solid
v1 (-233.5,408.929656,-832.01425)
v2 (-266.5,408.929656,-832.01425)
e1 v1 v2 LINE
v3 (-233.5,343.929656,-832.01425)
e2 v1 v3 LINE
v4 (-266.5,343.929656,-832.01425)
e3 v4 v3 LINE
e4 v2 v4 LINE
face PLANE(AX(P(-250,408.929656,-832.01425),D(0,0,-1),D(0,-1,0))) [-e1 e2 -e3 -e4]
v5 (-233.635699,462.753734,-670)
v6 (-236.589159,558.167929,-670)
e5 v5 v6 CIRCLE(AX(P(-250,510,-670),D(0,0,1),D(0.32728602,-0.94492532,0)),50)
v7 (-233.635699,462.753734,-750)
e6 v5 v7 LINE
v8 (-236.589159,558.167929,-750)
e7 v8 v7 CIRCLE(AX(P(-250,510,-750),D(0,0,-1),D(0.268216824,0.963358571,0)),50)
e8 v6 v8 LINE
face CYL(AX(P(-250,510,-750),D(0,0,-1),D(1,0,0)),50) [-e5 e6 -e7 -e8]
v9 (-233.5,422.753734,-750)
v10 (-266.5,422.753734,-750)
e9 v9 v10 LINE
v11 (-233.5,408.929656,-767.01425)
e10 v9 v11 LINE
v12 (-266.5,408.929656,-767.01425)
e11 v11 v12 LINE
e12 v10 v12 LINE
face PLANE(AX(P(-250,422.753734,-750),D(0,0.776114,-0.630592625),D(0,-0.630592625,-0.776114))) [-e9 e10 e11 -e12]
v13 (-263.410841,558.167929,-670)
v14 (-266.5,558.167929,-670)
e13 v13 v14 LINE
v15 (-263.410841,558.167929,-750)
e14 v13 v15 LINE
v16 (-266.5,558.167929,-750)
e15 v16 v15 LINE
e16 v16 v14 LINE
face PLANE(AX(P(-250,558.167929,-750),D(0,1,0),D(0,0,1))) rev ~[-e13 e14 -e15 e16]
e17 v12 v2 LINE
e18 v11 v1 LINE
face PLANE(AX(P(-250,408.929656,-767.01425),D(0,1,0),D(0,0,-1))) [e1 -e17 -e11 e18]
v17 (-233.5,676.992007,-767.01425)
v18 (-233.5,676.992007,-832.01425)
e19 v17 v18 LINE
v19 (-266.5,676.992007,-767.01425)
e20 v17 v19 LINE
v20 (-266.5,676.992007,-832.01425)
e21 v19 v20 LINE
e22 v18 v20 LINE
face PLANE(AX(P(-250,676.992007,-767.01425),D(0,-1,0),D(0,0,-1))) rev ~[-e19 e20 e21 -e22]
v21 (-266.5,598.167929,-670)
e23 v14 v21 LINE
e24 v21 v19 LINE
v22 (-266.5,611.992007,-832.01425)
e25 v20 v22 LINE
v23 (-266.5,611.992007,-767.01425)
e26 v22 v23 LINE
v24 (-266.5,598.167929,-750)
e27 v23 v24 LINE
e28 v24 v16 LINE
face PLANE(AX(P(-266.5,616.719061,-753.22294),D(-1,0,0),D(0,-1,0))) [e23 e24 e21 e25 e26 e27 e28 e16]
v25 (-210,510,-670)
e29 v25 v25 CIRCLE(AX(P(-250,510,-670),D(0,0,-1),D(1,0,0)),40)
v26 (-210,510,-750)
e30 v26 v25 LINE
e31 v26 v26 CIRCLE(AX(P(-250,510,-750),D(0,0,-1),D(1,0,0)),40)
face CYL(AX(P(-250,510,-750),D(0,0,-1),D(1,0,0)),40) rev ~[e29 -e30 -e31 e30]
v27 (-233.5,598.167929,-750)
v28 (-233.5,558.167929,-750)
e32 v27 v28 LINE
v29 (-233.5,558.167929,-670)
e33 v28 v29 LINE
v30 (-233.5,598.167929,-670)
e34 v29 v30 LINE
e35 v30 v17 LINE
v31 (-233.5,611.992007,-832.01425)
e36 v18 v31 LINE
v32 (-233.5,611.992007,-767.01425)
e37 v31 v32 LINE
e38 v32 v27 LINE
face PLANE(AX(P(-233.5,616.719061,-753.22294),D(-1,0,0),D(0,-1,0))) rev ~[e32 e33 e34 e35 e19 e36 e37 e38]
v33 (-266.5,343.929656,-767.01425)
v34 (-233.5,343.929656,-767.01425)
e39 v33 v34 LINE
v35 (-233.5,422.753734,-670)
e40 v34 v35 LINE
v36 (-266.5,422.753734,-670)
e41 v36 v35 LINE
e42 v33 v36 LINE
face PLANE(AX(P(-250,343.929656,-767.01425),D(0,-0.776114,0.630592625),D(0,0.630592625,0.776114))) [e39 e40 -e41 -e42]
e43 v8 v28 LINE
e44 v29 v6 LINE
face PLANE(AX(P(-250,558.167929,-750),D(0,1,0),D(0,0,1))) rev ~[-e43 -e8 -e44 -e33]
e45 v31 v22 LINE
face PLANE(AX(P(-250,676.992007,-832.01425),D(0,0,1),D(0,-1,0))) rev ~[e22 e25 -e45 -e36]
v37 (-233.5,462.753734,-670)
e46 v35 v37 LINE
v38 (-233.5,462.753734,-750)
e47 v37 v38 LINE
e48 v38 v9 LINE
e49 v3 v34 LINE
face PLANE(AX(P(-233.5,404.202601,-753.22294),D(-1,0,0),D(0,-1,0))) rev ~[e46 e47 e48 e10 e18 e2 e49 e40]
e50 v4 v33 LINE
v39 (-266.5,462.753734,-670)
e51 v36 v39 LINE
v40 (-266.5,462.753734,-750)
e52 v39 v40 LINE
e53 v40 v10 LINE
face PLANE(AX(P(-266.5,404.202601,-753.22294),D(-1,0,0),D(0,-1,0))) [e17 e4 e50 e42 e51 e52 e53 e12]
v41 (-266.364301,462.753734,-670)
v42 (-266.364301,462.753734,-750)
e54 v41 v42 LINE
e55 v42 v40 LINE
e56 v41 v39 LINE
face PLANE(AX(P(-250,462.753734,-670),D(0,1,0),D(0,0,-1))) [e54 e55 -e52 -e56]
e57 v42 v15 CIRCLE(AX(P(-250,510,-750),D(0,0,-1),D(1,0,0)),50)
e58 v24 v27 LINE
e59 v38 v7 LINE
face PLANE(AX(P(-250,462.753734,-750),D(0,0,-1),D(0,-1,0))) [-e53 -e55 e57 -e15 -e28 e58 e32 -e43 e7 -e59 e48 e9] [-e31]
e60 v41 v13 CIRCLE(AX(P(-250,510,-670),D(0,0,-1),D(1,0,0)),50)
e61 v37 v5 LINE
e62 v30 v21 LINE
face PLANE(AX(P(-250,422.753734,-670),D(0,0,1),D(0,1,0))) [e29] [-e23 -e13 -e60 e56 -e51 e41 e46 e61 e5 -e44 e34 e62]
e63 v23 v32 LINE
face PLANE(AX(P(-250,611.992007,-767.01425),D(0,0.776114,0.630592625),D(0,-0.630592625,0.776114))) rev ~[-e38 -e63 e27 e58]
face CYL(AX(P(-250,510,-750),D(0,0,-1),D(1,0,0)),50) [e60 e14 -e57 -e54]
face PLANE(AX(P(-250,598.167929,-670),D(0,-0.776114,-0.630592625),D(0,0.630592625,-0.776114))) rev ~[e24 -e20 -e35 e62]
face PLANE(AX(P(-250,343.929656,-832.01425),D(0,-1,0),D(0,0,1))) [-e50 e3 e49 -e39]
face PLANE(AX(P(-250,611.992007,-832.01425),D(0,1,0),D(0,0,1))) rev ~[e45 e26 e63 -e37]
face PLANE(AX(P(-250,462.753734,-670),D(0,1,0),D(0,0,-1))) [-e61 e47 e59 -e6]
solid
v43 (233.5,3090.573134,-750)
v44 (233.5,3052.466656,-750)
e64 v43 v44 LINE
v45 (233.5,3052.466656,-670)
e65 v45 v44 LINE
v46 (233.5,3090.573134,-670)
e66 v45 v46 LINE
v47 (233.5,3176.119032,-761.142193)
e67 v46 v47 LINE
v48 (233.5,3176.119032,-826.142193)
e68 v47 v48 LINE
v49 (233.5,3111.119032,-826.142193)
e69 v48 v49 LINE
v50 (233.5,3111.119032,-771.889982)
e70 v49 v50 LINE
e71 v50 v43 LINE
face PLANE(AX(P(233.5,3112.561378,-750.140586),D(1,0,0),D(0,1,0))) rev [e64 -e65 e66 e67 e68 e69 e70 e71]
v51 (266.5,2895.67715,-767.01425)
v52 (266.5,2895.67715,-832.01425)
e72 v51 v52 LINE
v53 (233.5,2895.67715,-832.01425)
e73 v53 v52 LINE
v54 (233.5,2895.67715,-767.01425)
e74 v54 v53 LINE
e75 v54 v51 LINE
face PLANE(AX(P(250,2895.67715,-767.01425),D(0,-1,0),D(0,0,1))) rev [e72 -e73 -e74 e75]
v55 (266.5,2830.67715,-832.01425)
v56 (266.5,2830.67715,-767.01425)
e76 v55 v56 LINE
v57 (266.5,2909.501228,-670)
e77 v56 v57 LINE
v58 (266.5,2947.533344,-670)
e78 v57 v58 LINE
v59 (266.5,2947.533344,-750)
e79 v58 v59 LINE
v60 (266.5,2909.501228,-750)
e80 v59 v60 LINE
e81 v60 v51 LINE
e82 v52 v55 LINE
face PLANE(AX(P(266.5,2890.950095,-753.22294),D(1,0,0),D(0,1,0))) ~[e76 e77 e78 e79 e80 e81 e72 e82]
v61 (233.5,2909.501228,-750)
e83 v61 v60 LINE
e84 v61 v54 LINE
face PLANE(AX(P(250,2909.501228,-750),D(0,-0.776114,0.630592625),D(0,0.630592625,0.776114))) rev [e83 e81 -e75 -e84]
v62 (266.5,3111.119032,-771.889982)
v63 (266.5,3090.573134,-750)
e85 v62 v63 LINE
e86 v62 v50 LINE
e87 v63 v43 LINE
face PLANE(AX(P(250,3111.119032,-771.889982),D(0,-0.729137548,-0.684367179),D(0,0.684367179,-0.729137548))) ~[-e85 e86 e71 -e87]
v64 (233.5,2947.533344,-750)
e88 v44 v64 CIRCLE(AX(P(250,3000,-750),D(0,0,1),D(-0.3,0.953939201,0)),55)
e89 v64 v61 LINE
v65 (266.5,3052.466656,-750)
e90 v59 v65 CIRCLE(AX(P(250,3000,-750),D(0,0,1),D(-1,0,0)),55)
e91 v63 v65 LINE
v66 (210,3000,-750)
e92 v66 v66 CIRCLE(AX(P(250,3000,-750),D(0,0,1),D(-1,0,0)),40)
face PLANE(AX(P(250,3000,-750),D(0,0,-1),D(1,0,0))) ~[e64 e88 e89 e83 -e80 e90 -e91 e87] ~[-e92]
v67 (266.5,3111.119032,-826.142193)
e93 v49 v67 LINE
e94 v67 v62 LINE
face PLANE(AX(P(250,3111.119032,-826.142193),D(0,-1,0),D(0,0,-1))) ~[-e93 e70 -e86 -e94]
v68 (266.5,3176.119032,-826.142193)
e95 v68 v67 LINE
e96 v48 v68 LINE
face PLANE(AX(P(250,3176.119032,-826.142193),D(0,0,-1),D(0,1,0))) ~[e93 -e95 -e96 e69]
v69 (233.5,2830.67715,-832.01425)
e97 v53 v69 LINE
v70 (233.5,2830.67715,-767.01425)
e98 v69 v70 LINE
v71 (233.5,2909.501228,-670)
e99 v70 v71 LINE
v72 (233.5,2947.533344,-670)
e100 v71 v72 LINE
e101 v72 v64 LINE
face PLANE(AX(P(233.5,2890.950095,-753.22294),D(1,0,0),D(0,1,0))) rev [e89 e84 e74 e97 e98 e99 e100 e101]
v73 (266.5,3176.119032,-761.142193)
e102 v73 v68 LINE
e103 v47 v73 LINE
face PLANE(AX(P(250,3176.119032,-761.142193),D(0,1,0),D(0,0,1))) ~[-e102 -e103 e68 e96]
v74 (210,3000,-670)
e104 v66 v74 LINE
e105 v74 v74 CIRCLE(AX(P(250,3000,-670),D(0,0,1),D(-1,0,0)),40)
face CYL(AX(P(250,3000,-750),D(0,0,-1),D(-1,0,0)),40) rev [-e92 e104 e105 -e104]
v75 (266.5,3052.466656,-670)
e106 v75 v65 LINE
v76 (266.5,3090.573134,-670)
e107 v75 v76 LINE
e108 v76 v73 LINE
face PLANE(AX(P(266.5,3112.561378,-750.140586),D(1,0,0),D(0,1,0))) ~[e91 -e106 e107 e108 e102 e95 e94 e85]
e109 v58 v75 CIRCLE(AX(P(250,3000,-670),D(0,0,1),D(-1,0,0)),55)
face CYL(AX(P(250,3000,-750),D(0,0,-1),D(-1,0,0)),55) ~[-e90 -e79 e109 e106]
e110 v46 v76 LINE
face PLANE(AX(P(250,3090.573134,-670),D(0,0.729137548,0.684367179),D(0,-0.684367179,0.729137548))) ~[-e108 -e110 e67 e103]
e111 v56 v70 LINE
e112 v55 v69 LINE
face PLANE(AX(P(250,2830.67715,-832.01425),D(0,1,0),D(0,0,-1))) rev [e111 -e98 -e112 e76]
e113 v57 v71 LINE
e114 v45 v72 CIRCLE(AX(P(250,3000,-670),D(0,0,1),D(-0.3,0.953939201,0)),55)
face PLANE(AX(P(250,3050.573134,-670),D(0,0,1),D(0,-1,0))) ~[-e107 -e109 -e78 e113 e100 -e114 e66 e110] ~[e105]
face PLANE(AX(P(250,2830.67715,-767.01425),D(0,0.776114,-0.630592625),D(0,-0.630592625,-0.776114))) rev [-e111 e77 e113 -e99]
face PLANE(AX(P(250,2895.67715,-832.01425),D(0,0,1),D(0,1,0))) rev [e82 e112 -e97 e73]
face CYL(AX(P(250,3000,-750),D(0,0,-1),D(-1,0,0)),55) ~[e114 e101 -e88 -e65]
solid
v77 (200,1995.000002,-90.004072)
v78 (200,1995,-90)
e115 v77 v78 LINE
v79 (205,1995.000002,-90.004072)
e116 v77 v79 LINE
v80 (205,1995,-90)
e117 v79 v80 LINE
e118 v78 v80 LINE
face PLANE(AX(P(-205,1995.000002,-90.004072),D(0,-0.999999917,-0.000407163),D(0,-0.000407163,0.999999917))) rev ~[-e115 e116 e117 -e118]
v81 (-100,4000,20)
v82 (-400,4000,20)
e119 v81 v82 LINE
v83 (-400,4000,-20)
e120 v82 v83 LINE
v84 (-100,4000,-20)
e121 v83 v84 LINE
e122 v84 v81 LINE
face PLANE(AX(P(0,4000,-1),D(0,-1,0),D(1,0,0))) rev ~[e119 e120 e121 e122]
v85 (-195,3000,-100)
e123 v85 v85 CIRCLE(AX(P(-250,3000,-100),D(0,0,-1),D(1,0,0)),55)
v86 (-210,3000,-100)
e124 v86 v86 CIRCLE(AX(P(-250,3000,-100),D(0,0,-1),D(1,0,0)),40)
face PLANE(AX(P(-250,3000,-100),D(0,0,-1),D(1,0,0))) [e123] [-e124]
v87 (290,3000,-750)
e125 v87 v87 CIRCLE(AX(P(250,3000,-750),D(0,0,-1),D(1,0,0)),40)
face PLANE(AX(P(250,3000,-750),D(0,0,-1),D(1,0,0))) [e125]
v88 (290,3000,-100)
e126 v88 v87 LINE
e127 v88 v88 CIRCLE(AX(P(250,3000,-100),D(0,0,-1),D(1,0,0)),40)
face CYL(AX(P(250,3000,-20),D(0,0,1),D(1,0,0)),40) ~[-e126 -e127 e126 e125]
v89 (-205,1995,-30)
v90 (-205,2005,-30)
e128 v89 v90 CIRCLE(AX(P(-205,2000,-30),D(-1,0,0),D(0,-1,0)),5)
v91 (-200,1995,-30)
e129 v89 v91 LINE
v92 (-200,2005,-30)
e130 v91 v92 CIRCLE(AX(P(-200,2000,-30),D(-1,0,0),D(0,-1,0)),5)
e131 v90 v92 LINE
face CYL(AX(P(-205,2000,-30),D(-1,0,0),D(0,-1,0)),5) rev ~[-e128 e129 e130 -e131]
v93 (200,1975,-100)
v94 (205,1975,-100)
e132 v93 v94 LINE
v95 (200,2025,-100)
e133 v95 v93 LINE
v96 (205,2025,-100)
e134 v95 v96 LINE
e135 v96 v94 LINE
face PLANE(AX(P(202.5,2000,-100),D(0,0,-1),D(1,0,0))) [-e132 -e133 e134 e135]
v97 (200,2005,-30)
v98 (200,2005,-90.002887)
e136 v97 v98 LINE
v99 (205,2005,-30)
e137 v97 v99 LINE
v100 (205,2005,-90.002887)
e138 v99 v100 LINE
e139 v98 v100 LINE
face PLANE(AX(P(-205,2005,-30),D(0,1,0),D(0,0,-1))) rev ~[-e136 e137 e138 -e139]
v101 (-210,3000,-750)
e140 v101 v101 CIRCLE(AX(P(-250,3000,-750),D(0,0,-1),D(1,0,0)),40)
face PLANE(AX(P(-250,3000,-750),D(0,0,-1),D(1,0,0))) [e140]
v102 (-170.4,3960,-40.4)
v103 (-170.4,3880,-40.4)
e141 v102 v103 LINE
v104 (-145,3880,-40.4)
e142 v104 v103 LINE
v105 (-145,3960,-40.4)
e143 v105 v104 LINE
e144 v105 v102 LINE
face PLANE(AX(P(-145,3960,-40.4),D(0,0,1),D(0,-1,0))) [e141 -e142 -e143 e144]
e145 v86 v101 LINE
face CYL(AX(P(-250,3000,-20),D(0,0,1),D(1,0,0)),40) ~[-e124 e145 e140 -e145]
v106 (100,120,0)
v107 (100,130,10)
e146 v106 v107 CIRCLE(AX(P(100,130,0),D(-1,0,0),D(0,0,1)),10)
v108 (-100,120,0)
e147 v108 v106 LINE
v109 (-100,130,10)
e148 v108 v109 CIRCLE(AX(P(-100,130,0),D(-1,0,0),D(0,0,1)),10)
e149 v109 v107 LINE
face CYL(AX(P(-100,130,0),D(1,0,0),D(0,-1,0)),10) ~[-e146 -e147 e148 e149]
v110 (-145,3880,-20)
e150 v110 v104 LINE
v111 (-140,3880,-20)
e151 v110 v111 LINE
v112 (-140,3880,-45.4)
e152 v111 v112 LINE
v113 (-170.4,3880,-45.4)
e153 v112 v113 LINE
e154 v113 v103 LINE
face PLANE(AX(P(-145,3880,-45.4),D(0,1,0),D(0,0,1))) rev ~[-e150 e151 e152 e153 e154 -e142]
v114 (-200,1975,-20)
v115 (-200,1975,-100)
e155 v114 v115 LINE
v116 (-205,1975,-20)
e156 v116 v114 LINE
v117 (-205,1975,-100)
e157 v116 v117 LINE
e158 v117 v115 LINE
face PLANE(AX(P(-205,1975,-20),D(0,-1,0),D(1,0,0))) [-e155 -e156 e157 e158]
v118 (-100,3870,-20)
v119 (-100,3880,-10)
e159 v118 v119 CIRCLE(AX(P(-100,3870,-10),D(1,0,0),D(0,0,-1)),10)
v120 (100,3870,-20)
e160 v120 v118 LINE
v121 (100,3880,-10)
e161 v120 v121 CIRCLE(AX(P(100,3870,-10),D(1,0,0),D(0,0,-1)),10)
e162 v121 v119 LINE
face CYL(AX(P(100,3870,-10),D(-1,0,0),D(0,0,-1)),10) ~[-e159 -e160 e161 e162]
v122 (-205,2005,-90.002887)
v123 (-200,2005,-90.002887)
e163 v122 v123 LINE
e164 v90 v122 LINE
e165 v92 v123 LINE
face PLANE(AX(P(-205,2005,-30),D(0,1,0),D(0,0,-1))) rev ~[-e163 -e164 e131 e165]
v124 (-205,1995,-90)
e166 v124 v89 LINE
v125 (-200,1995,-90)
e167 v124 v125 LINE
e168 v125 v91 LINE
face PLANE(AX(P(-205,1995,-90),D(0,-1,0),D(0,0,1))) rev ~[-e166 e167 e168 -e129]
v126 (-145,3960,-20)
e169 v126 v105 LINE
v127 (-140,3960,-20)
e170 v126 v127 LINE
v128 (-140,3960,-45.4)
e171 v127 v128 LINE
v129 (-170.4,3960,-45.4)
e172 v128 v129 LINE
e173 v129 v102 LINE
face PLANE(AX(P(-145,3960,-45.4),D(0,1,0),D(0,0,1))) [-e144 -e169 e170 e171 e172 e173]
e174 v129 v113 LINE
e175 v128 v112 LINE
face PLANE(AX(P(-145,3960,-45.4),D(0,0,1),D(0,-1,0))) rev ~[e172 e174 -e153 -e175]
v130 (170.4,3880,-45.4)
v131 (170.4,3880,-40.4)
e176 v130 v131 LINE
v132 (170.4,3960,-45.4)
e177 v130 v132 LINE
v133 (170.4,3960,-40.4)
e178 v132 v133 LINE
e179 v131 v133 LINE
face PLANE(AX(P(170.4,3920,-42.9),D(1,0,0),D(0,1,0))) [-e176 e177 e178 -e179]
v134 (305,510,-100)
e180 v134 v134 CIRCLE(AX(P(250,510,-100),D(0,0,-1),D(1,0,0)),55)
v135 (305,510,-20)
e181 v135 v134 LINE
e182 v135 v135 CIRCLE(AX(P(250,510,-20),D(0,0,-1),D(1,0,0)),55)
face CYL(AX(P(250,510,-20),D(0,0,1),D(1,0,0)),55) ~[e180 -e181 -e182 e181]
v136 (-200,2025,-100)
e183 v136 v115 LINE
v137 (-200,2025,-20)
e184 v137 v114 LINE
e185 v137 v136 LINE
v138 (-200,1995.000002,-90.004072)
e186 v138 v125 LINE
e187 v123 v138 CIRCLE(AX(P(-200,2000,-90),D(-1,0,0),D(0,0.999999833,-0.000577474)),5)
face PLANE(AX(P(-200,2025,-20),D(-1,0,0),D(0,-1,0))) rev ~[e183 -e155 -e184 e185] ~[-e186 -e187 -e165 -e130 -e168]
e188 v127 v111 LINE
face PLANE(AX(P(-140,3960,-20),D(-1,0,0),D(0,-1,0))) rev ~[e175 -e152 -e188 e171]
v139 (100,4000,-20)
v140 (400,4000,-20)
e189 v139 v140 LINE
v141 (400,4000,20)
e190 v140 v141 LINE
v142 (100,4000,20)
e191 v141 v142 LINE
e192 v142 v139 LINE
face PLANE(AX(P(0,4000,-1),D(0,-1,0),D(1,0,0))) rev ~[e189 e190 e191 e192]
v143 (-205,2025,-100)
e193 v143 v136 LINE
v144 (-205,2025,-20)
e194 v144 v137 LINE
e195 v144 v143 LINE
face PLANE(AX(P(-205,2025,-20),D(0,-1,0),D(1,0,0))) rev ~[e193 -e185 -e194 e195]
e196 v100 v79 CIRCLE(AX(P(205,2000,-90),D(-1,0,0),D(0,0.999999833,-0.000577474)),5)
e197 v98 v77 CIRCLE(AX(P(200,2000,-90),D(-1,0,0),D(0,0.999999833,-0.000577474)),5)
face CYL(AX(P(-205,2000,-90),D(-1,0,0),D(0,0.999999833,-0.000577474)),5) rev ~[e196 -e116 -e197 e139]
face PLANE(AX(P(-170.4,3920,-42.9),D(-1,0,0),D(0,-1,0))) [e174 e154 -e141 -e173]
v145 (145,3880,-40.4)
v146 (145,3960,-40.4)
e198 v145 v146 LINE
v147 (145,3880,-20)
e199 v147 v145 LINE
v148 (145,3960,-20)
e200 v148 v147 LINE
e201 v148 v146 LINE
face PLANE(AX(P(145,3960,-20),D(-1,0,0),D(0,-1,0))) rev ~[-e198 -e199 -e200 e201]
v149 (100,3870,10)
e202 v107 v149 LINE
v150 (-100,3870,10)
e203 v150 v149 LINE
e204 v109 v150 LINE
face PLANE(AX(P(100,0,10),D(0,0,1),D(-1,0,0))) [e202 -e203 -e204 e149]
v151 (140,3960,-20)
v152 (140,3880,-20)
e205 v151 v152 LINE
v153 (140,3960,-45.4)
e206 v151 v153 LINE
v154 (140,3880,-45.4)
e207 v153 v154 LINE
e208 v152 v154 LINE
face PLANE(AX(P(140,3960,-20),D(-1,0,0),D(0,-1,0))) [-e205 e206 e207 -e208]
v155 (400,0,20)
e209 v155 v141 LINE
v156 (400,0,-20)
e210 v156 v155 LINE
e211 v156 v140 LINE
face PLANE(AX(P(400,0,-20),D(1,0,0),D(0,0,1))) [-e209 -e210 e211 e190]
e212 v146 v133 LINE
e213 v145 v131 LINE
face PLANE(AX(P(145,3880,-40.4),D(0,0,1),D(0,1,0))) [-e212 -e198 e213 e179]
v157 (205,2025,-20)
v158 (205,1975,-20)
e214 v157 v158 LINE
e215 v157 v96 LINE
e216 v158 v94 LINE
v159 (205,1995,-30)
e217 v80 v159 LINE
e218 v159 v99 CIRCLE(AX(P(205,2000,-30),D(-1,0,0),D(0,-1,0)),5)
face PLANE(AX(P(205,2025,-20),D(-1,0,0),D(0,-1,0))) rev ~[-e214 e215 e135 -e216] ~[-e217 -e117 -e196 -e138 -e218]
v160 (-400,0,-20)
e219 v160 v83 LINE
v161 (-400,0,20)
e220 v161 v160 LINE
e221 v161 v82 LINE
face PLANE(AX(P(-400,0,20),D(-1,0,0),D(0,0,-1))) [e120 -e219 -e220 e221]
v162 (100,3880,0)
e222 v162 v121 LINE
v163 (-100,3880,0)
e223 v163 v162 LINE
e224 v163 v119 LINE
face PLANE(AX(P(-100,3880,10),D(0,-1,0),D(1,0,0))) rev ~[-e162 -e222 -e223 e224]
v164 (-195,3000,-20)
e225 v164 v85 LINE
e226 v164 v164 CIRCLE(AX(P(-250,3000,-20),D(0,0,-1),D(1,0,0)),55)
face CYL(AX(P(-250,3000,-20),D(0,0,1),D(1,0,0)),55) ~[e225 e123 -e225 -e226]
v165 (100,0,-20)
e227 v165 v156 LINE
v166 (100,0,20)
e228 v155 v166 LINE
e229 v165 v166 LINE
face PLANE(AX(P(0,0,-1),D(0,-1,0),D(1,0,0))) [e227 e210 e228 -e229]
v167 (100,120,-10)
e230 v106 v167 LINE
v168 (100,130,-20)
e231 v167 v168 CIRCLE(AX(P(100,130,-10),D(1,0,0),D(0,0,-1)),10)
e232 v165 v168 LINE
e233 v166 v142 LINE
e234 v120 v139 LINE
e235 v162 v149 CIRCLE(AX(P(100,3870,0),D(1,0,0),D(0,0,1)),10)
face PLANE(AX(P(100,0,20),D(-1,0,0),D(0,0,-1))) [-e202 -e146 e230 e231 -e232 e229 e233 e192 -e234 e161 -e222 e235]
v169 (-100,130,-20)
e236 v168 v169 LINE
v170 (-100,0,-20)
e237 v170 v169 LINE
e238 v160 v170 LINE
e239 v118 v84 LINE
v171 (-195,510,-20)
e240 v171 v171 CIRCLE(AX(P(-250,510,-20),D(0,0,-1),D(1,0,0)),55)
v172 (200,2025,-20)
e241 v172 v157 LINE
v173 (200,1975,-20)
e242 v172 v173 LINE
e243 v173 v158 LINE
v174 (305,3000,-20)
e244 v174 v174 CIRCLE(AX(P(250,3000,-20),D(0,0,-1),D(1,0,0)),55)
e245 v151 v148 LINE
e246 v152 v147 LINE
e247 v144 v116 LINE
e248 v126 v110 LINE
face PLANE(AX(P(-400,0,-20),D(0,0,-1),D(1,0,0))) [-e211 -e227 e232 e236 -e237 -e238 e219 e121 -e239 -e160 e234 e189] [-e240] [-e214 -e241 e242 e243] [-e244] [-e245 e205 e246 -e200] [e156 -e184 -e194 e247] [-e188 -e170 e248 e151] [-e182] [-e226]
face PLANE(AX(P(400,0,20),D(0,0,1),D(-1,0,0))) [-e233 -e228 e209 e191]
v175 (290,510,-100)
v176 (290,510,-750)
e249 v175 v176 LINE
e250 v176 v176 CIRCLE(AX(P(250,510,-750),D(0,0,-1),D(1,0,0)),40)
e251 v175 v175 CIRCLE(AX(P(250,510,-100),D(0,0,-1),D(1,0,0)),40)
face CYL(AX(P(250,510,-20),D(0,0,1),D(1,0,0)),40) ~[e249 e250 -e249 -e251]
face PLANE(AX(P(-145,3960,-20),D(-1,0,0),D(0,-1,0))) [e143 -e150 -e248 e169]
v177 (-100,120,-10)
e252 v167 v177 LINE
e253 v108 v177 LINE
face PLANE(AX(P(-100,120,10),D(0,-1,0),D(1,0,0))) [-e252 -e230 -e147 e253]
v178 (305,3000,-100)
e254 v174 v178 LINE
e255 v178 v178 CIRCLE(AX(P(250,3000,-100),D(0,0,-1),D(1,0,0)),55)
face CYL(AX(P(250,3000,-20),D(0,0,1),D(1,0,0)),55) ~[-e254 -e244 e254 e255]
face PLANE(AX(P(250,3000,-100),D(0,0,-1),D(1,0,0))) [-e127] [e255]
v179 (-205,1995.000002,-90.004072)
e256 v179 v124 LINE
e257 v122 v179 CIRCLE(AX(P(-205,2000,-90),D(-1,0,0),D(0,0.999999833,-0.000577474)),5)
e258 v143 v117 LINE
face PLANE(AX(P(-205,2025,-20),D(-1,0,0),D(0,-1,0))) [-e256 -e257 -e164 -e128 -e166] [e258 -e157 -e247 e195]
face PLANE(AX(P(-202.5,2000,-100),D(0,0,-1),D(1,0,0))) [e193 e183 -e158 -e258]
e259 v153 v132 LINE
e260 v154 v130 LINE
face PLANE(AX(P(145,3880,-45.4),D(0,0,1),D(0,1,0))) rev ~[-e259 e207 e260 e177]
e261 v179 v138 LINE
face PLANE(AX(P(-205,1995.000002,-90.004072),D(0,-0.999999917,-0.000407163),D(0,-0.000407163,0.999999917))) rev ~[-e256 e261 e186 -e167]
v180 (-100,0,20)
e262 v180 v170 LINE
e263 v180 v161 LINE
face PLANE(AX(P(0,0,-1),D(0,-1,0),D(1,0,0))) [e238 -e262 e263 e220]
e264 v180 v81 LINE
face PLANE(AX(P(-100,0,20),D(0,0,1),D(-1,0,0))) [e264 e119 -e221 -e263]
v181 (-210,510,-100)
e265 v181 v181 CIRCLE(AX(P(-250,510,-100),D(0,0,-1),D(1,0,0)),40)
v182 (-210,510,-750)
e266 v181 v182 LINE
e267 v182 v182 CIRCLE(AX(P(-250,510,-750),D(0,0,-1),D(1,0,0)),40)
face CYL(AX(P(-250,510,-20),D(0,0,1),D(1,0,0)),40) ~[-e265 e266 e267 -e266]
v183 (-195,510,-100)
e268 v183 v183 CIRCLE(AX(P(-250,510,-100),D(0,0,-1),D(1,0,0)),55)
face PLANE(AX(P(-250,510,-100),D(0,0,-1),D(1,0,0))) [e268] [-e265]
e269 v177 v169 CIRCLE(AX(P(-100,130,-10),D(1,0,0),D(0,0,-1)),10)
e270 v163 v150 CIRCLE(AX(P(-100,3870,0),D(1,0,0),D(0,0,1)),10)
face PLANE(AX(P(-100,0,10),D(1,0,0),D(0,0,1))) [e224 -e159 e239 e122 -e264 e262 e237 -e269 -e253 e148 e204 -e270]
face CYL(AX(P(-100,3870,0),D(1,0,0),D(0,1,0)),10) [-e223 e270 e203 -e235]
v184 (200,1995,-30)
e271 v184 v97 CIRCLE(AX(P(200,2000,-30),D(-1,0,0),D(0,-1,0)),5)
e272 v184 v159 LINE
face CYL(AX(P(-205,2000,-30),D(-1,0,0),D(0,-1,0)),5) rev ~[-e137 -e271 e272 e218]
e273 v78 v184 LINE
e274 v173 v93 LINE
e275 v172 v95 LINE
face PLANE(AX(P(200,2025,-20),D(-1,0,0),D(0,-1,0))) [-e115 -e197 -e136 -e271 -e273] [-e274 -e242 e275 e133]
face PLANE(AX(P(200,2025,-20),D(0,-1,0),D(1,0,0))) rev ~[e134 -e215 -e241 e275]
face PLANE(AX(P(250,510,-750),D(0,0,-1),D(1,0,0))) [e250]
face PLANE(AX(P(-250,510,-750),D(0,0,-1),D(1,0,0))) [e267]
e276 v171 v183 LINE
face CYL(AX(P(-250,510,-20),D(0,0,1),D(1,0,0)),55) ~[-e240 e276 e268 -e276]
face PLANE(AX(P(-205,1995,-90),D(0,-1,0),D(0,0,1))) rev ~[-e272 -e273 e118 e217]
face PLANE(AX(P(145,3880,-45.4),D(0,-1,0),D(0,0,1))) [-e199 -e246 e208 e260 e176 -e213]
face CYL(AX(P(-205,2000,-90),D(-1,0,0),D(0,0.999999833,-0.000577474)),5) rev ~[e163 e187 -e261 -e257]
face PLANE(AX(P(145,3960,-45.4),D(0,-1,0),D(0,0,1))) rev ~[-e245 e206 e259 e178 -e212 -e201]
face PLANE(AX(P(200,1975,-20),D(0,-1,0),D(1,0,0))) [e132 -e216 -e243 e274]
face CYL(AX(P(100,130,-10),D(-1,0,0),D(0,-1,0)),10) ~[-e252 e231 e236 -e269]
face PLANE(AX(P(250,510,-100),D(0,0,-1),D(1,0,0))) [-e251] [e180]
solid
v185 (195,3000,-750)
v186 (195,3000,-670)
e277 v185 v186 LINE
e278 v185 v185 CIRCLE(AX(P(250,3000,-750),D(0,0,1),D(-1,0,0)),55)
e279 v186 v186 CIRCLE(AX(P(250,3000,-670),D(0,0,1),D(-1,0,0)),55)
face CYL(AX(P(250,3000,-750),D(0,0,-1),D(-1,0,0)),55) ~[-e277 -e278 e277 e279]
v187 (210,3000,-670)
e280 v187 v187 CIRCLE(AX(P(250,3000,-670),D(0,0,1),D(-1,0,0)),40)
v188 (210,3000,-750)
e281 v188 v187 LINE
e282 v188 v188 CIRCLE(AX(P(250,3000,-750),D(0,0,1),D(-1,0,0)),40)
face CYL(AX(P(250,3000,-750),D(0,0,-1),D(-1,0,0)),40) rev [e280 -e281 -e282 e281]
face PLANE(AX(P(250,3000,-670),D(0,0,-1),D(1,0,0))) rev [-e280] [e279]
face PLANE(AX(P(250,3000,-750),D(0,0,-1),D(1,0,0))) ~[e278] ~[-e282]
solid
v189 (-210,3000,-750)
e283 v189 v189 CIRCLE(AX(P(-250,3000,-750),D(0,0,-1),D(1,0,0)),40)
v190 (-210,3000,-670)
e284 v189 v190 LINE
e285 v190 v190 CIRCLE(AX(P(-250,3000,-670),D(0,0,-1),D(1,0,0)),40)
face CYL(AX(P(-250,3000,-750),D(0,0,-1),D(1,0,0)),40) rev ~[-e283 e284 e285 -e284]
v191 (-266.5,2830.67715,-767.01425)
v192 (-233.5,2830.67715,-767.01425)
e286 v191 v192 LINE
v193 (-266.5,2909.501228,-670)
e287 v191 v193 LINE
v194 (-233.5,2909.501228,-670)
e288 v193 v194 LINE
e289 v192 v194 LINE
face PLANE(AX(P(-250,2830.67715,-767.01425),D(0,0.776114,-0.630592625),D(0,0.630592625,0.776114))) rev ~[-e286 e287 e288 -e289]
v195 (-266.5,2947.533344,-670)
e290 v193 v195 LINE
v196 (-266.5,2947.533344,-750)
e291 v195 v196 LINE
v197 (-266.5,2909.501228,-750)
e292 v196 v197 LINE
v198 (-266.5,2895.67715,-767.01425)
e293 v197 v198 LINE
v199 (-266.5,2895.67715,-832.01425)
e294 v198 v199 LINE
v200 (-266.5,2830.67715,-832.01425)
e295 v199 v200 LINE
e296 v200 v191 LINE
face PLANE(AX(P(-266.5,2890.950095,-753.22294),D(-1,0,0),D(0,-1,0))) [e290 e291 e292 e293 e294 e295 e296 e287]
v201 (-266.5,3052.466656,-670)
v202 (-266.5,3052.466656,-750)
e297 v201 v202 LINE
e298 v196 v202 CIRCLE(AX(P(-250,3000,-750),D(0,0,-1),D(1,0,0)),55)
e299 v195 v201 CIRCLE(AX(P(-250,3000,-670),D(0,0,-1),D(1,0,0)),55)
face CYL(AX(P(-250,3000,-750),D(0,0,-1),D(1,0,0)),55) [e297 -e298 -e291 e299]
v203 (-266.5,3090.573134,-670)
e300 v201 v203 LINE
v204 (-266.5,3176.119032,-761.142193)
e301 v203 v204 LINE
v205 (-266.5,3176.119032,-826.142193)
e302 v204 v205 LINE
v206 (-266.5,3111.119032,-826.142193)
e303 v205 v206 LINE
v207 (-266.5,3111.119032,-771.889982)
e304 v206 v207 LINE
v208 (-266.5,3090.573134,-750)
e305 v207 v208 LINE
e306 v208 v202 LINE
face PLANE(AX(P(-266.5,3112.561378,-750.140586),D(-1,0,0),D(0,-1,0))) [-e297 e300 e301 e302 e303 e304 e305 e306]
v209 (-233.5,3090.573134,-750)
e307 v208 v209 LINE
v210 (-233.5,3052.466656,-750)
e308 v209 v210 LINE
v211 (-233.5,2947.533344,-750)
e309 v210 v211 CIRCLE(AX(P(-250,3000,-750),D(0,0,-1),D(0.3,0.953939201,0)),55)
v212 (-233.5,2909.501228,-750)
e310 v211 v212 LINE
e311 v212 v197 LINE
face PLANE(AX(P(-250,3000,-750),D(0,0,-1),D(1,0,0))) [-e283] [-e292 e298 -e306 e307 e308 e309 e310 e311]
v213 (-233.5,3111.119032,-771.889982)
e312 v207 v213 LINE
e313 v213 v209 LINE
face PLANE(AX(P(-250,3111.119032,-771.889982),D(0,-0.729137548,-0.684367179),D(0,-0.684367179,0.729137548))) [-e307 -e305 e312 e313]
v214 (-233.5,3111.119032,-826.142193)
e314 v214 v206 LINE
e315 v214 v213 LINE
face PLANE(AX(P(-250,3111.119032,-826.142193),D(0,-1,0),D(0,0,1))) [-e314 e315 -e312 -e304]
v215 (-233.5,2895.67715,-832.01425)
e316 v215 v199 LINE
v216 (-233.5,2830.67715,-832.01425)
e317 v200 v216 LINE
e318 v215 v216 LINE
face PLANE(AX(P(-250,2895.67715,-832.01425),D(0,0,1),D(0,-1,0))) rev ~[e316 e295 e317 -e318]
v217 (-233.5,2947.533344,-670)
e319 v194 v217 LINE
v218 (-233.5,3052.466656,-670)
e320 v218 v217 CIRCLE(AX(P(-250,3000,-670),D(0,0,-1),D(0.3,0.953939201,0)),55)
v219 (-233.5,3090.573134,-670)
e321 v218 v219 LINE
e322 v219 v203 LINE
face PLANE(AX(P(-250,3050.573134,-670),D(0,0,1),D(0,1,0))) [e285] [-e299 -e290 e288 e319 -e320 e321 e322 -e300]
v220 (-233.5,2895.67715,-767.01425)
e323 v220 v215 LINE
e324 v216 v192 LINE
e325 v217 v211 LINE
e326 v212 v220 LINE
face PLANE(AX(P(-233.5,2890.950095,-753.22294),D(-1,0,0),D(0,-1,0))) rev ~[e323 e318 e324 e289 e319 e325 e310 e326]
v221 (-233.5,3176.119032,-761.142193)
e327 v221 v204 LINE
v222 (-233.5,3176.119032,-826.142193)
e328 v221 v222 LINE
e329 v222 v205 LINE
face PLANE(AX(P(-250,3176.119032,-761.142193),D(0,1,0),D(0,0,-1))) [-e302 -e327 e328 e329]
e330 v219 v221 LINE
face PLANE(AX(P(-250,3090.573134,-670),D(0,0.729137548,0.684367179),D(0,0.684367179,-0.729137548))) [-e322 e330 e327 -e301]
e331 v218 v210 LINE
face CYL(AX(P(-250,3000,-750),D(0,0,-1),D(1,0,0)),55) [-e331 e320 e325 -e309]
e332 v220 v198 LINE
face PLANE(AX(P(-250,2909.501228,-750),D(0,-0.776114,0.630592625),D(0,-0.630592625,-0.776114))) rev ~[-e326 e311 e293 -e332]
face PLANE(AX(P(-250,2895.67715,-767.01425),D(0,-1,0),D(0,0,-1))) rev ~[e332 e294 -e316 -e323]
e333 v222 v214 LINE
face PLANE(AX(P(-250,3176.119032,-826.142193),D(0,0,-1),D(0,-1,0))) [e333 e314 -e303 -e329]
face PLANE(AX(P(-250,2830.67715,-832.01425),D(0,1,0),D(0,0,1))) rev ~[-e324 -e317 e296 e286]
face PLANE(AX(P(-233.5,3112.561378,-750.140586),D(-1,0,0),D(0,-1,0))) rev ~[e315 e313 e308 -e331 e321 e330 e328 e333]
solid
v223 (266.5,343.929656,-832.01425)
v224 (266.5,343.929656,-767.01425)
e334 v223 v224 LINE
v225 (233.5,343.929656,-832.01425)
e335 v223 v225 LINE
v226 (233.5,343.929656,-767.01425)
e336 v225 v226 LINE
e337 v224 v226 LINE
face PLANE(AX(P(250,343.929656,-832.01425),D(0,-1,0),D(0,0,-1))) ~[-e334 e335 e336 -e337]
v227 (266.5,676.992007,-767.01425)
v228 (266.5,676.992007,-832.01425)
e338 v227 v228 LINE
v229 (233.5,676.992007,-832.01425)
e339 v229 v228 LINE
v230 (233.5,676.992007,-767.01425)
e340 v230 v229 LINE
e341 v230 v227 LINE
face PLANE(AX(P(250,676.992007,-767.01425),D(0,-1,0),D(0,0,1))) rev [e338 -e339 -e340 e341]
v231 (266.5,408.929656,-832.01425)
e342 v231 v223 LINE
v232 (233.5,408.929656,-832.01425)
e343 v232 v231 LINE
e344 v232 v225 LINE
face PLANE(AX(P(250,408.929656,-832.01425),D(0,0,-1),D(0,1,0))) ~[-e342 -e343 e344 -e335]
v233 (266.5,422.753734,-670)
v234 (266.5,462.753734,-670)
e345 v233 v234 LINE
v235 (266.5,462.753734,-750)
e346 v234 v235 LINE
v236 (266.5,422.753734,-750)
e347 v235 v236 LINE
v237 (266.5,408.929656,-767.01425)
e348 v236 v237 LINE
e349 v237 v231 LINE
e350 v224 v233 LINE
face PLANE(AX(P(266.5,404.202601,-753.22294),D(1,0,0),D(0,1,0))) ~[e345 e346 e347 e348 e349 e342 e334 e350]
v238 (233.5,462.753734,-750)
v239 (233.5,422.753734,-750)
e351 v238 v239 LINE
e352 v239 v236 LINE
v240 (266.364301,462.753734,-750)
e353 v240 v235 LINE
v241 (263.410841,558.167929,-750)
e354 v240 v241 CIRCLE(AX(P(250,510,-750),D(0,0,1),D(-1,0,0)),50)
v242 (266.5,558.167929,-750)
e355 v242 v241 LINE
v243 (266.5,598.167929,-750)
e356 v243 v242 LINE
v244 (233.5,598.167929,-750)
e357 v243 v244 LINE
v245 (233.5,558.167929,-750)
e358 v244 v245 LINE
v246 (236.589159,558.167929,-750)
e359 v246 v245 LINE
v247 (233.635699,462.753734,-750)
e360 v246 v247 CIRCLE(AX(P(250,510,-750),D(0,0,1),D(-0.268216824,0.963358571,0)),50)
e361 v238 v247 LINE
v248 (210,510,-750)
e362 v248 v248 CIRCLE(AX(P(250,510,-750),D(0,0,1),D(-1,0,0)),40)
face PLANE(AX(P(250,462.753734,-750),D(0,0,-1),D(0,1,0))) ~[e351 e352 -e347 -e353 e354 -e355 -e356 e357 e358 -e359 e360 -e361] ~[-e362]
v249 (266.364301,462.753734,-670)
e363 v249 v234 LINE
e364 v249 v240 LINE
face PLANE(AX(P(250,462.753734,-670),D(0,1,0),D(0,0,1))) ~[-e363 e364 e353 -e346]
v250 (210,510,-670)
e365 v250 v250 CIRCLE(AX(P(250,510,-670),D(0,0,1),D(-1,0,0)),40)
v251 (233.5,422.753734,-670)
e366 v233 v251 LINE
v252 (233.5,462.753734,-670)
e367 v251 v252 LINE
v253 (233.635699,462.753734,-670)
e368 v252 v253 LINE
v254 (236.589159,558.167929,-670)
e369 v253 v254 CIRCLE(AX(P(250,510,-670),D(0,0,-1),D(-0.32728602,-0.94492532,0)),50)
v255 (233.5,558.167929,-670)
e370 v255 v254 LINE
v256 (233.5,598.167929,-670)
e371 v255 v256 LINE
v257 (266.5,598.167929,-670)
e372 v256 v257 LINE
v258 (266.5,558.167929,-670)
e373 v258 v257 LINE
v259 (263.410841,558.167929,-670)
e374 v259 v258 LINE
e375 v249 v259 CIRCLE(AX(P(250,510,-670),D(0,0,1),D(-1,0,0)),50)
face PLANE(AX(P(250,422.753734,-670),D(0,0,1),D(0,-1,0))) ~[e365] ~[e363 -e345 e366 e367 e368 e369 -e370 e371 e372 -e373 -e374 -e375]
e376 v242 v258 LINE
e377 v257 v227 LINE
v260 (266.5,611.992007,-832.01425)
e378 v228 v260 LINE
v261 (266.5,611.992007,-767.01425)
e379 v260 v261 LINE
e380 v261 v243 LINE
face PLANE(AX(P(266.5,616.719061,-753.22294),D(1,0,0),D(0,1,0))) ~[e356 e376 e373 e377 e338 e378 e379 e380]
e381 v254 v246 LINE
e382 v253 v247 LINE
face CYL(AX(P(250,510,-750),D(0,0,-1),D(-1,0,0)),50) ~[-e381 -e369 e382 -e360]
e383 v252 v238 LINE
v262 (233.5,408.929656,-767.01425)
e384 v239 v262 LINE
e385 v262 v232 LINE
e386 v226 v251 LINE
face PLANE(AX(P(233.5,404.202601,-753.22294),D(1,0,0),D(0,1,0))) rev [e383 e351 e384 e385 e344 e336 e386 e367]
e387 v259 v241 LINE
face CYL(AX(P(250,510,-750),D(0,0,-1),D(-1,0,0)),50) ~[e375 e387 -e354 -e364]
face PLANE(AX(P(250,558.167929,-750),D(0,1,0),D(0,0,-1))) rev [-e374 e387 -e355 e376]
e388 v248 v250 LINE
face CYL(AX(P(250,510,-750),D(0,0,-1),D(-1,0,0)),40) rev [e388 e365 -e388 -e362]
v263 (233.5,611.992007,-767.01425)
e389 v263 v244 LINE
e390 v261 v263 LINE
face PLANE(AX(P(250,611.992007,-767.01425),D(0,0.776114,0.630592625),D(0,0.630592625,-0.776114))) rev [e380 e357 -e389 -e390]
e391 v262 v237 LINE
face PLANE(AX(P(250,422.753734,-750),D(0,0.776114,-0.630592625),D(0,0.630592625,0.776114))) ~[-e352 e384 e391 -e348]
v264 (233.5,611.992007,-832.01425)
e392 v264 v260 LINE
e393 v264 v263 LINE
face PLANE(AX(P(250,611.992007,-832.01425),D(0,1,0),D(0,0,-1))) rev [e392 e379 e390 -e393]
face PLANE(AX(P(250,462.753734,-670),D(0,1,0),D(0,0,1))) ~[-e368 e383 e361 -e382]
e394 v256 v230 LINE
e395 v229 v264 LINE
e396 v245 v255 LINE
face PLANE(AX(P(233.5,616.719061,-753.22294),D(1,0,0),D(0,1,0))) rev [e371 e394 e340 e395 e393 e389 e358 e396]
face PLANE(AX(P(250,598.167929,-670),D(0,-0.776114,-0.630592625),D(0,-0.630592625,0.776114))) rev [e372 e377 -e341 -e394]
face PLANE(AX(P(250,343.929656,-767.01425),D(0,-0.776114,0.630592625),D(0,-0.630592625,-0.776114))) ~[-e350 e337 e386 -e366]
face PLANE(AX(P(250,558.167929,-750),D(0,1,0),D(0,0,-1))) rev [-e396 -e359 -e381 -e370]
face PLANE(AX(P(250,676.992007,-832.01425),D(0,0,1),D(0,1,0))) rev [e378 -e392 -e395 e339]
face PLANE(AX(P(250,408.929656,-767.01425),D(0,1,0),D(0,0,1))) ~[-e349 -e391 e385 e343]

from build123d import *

# Parameters (mm, degrees)
F1_DEPTH  = 4000
F2_W      = 200
F2_H      = 120
F3_DEPTH  = 55.88
F4_R      = 10
F5_R      = 55
F5_R_2    = 40
F6_DEPTH  = 80
F7_W      = 5
F7_H      = 50
F8_DEPTH  = 80
F10_DEPTH = 605.001
F11_R     = 40
F12_DEPTH = 730
F13_R     = 50
F13_R_2   = 40
F14_DEPTH = 80
F17_DEPTH = 16.5
F19_R     = 55
F19_R_2   = 40
F20_DEPTH = 80
F24_DEPTH = 16.5
F26_W     = 5
F26_H     = 80
F27_DEPTH = 25.4
F28_W     = 80
F28_H     = 5
F29_DEPTH = 25.4
F30_W     = 80
F30_H     = 5
F31_DEPTH = 25.4


# Not quite as in the source:
# - ends of sketch curves that miss each other by under 0.0002 mm in the source are joined


with BuildPart() as f1:
    # F0 (on Front) → F1 (new body)
    with BuildSketch(Plane.XZ):
        Polygon((-100, 10), (-100, 20), (-400, 20), (-400, -20), (400, -20), (400, 20), (100, 20), (100, 10), align=None)
    extrude(amount=-F1_DEPTH)

    # F2 (on face) → F3 (cut)
    with BuildSketch(Plane.XY.offset(10)):
        with Locations((0, 60)):
            Rectangle(F2_W, F2_H)
        with Locations((0, 3940)):
            Rectangle(F2_W, F2_H)
    extrude(amount=-F3_DEPTH, mode=Mode.SUBTRACT)

    # F4
    f4_edges = [f1.edges().sort_by_distance(p)[0] for p in [
        (0, 3880, 10),
        (0, 120, 10),
        (0, 120, -20),
        (0, 3880, -20),
    ]]
    fillet(f4_edges, radius=F4_R)

    # F5 (on face) → F6 (join)
    with BuildSketch(Plane(origin=(0, 0, -20), x_dir=(1, 0, 0), z_dir=(0, 0, -1))):
        with Locations((-250, -510)):
            Circle(F5_R)
        with Locations((-250, -510)):
            Circle(F5_R_2, mode=Mode.SUBTRACT)
        with Locations((-250, -3000)):
            Circle(F5_R)
        with Locations((-250, -3000)):
            Circle(F5_R_2, mode=Mode.SUBTRACT)
        with Locations((250, -510)):
            Circle(F5_R)
        with Locations((250, -510)):
            Circle(F5_R_2, mode=Mode.SUBTRACT)
        with Locations((250, -3000)):
            Circle(F5_R)
        with Locations((250, -3000)):
            Circle(F5_R_2, mode=Mode.SUBTRACT)
    extrude(amount=F6_DEPTH)

    # F7 (on face) → F8 (join)
    with BuildSketch(Plane(origin=(0, 0, -20), x_dir=(1, 0, 0), z_dir=(0, 0, -1))):
        with Locations((-202.5, -2000)):
            Rectangle(F7_W, F7_H)
        with Locations((202.5, -2000)):
            Rectangle(F7_W, F7_H)
    extrude(amount=F8_DEPTH)

    # F9 (on face) → F10 (cut, through all)
    with BuildSketch(Plane(origin=(-205, 0, 0), x_dir=(0, -1, 0), z_dir=(-1, 0, 0))):
        with BuildLine():
            Line((-1995, -90), (-1995, -30))
            ThreePointArc((-1995, -30), (-2000, -25), (-2005, -30))
            Line((-2005, -30), (-2005, -90))
            Line((-2005, -90), (-2005, -90.002886951))
            ThreePointArc((-2005, -90.002886951), (-2000.0005923209, -94.9999999649), (-1995.0000016578, -90.0040715919))
            Line((-1995.0000016578, -90.0040715919), (-1995, -90))
        make_face()
    extrude(amount=-F10_DEPTH, mode=Mode.SUBTRACT)

    # F11 (on face) → F12 (join)
    with BuildSketch(Plane(origin=(0, 0, -20), x_dir=(1, 0, 0), z_dir=(0, 0, -1))):
        with Locations((250, -3000)):
            Circle(F11_R)
        with Locations((-250, -3000)):
            Circle(F11_R)
        with Locations((-250, -510)):
            Circle(F11_R)
        with Locations((250, -510)):
            Circle(F11_R)
    extrude(amount=F12_DEPTH)

    # F26 (on face) → F27 (join)
    with BuildSketch(Plane(origin=(0, 0, -20), x_dir=(1, 0, 0), z_dir=(0, 0, -1))):
        with Locations((142.5, -3920)):
            Rectangle(F26_W, F26_H)
        with Locations((-142.5, -3920)):
            Rectangle(F26_W, F26_H)
    extrude(amount=F27_DEPTH)

    # F28 (on face) → F29 (join)
    with BuildSketch(Plane(origin=(-145, 0, 0), x_dir=(0, -1, 0), z_dir=(-1, 0, 0))):
        with Locations((-3920, -42.9)):
            Rectangle(F28_W, F28_H)
    extrude(amount=F29_DEPTH)

    # F30 (on face) → F31 (join)
    with BuildSketch(Plane.YZ.offset(145)):
        with Locations((3920, -42.9)):
            Rectangle(F30_W, F30_H)
    extrude(amount=F31_DEPTH)


with BuildPart() as f14:
    # F13 (on face) → F14 (new body)
    with BuildSketch(Plane(origin=(0, 0, -750), x_dir=(1, 0, 0), z_dir=(0, 0, -1))):
        with Locations((-250, -510)):
            Circle(F13_R)
        with Locations((-250, -510)):
            Circle(F13_R_2, mode=Mode.SUBTRACT)
    extrude(amount=-F14_DEPTH)

    # F16 (on face) → F17 (join, symmetric)
    with BuildSketch(Plane(origin=(-250, 0, 0), x_dir=(0, -1, 0), z_dir=(-1, 0, 0))):
        Polygon((-558.1679285306, -750), (-558.1679285306, -670), (-598.1679285306, -670), (-676.9920066674, -767.0142500145), (-676.9920066674, -832.0142500145), (-611.9920066674, -832.0142500145), (-611.9920066674, -767.0142500145), (-598.1679285306, -750), align=None)
        Polygon((-422.7537339867, -670), (-462.7537339867, -670), (-462.7537339867, -750), (-422.7537339867, -750), (-408.9296558499, -767.0142500145), (-408.9296558499, -832.0142500145), (-343.9296558499, -832.0142500145), (-343.9296558499, -767.0142500145), align=None)
    extrude(amount=F17_DEPTH, both=True)


with BuildPart() as f18_1:
    # F18: instance of F14
    add(f14.part.mirror(Plane.YZ))


with BuildPart() as f20:
    # F19 (on face) → F20 (new body)
    with BuildSketch(Plane(origin=(0, 0, -750), x_dir=(1, 0, 0), z_dir=(0, 0, -1))):
        with Locations((-250, -3000)):
            Circle(F19_R)
        with Locations((-250, -3000)):
            Circle(F19_R_2, mode=Mode.SUBTRACT)
    extrude(amount=-F20_DEPTH)


with BuildPart() as f21_1:
    # F21: instance of F20
    add(f20.part.mirror(Plane.YZ))


with BuildPart() as f20_1:
    add(f20.part)

    # F23 (on face) → F24 (join, symmetric)
    with BuildSketch(Plane(origin=(-250, 0, 0), x_dir=(0, -1, 0), z_dir=(-1, 0, 0))):
        Polygon((-2909.501227852, -670), (-2949.501227852, -670), (-2949.501227852, -750), (-2909.501227852, -750), (-2895.6771497151, -767.0142500145), (-2895.6771497151, -832.0142500145), (-2830.6771497151, -832.0142500145), (-2830.6771497151, -767.0142500145), align=None)
        Polygon((-3050.5731344893, -750), (-3050.5731344893, -670), (-3090.5731344893, -670), (-3176.1190319061, -761.1421934954), (-3176.1190319061, -826.1421934954), (-3111.1190319061, -826.1421934954), (-3111.1190319061, -771.8899820383), (-3090.5731344893, -750), align=None)
    extrude(amount=F24_DEPTH, both=True)


with BuildPart() as f25_1:
    # F25: instance of F20
    add(f20_1.part.mirror(Plane.YZ))


solid = Compound([f1.part, f14.part, f18_1.part, f21_1.part, f20_1.part, f25_1.part])
